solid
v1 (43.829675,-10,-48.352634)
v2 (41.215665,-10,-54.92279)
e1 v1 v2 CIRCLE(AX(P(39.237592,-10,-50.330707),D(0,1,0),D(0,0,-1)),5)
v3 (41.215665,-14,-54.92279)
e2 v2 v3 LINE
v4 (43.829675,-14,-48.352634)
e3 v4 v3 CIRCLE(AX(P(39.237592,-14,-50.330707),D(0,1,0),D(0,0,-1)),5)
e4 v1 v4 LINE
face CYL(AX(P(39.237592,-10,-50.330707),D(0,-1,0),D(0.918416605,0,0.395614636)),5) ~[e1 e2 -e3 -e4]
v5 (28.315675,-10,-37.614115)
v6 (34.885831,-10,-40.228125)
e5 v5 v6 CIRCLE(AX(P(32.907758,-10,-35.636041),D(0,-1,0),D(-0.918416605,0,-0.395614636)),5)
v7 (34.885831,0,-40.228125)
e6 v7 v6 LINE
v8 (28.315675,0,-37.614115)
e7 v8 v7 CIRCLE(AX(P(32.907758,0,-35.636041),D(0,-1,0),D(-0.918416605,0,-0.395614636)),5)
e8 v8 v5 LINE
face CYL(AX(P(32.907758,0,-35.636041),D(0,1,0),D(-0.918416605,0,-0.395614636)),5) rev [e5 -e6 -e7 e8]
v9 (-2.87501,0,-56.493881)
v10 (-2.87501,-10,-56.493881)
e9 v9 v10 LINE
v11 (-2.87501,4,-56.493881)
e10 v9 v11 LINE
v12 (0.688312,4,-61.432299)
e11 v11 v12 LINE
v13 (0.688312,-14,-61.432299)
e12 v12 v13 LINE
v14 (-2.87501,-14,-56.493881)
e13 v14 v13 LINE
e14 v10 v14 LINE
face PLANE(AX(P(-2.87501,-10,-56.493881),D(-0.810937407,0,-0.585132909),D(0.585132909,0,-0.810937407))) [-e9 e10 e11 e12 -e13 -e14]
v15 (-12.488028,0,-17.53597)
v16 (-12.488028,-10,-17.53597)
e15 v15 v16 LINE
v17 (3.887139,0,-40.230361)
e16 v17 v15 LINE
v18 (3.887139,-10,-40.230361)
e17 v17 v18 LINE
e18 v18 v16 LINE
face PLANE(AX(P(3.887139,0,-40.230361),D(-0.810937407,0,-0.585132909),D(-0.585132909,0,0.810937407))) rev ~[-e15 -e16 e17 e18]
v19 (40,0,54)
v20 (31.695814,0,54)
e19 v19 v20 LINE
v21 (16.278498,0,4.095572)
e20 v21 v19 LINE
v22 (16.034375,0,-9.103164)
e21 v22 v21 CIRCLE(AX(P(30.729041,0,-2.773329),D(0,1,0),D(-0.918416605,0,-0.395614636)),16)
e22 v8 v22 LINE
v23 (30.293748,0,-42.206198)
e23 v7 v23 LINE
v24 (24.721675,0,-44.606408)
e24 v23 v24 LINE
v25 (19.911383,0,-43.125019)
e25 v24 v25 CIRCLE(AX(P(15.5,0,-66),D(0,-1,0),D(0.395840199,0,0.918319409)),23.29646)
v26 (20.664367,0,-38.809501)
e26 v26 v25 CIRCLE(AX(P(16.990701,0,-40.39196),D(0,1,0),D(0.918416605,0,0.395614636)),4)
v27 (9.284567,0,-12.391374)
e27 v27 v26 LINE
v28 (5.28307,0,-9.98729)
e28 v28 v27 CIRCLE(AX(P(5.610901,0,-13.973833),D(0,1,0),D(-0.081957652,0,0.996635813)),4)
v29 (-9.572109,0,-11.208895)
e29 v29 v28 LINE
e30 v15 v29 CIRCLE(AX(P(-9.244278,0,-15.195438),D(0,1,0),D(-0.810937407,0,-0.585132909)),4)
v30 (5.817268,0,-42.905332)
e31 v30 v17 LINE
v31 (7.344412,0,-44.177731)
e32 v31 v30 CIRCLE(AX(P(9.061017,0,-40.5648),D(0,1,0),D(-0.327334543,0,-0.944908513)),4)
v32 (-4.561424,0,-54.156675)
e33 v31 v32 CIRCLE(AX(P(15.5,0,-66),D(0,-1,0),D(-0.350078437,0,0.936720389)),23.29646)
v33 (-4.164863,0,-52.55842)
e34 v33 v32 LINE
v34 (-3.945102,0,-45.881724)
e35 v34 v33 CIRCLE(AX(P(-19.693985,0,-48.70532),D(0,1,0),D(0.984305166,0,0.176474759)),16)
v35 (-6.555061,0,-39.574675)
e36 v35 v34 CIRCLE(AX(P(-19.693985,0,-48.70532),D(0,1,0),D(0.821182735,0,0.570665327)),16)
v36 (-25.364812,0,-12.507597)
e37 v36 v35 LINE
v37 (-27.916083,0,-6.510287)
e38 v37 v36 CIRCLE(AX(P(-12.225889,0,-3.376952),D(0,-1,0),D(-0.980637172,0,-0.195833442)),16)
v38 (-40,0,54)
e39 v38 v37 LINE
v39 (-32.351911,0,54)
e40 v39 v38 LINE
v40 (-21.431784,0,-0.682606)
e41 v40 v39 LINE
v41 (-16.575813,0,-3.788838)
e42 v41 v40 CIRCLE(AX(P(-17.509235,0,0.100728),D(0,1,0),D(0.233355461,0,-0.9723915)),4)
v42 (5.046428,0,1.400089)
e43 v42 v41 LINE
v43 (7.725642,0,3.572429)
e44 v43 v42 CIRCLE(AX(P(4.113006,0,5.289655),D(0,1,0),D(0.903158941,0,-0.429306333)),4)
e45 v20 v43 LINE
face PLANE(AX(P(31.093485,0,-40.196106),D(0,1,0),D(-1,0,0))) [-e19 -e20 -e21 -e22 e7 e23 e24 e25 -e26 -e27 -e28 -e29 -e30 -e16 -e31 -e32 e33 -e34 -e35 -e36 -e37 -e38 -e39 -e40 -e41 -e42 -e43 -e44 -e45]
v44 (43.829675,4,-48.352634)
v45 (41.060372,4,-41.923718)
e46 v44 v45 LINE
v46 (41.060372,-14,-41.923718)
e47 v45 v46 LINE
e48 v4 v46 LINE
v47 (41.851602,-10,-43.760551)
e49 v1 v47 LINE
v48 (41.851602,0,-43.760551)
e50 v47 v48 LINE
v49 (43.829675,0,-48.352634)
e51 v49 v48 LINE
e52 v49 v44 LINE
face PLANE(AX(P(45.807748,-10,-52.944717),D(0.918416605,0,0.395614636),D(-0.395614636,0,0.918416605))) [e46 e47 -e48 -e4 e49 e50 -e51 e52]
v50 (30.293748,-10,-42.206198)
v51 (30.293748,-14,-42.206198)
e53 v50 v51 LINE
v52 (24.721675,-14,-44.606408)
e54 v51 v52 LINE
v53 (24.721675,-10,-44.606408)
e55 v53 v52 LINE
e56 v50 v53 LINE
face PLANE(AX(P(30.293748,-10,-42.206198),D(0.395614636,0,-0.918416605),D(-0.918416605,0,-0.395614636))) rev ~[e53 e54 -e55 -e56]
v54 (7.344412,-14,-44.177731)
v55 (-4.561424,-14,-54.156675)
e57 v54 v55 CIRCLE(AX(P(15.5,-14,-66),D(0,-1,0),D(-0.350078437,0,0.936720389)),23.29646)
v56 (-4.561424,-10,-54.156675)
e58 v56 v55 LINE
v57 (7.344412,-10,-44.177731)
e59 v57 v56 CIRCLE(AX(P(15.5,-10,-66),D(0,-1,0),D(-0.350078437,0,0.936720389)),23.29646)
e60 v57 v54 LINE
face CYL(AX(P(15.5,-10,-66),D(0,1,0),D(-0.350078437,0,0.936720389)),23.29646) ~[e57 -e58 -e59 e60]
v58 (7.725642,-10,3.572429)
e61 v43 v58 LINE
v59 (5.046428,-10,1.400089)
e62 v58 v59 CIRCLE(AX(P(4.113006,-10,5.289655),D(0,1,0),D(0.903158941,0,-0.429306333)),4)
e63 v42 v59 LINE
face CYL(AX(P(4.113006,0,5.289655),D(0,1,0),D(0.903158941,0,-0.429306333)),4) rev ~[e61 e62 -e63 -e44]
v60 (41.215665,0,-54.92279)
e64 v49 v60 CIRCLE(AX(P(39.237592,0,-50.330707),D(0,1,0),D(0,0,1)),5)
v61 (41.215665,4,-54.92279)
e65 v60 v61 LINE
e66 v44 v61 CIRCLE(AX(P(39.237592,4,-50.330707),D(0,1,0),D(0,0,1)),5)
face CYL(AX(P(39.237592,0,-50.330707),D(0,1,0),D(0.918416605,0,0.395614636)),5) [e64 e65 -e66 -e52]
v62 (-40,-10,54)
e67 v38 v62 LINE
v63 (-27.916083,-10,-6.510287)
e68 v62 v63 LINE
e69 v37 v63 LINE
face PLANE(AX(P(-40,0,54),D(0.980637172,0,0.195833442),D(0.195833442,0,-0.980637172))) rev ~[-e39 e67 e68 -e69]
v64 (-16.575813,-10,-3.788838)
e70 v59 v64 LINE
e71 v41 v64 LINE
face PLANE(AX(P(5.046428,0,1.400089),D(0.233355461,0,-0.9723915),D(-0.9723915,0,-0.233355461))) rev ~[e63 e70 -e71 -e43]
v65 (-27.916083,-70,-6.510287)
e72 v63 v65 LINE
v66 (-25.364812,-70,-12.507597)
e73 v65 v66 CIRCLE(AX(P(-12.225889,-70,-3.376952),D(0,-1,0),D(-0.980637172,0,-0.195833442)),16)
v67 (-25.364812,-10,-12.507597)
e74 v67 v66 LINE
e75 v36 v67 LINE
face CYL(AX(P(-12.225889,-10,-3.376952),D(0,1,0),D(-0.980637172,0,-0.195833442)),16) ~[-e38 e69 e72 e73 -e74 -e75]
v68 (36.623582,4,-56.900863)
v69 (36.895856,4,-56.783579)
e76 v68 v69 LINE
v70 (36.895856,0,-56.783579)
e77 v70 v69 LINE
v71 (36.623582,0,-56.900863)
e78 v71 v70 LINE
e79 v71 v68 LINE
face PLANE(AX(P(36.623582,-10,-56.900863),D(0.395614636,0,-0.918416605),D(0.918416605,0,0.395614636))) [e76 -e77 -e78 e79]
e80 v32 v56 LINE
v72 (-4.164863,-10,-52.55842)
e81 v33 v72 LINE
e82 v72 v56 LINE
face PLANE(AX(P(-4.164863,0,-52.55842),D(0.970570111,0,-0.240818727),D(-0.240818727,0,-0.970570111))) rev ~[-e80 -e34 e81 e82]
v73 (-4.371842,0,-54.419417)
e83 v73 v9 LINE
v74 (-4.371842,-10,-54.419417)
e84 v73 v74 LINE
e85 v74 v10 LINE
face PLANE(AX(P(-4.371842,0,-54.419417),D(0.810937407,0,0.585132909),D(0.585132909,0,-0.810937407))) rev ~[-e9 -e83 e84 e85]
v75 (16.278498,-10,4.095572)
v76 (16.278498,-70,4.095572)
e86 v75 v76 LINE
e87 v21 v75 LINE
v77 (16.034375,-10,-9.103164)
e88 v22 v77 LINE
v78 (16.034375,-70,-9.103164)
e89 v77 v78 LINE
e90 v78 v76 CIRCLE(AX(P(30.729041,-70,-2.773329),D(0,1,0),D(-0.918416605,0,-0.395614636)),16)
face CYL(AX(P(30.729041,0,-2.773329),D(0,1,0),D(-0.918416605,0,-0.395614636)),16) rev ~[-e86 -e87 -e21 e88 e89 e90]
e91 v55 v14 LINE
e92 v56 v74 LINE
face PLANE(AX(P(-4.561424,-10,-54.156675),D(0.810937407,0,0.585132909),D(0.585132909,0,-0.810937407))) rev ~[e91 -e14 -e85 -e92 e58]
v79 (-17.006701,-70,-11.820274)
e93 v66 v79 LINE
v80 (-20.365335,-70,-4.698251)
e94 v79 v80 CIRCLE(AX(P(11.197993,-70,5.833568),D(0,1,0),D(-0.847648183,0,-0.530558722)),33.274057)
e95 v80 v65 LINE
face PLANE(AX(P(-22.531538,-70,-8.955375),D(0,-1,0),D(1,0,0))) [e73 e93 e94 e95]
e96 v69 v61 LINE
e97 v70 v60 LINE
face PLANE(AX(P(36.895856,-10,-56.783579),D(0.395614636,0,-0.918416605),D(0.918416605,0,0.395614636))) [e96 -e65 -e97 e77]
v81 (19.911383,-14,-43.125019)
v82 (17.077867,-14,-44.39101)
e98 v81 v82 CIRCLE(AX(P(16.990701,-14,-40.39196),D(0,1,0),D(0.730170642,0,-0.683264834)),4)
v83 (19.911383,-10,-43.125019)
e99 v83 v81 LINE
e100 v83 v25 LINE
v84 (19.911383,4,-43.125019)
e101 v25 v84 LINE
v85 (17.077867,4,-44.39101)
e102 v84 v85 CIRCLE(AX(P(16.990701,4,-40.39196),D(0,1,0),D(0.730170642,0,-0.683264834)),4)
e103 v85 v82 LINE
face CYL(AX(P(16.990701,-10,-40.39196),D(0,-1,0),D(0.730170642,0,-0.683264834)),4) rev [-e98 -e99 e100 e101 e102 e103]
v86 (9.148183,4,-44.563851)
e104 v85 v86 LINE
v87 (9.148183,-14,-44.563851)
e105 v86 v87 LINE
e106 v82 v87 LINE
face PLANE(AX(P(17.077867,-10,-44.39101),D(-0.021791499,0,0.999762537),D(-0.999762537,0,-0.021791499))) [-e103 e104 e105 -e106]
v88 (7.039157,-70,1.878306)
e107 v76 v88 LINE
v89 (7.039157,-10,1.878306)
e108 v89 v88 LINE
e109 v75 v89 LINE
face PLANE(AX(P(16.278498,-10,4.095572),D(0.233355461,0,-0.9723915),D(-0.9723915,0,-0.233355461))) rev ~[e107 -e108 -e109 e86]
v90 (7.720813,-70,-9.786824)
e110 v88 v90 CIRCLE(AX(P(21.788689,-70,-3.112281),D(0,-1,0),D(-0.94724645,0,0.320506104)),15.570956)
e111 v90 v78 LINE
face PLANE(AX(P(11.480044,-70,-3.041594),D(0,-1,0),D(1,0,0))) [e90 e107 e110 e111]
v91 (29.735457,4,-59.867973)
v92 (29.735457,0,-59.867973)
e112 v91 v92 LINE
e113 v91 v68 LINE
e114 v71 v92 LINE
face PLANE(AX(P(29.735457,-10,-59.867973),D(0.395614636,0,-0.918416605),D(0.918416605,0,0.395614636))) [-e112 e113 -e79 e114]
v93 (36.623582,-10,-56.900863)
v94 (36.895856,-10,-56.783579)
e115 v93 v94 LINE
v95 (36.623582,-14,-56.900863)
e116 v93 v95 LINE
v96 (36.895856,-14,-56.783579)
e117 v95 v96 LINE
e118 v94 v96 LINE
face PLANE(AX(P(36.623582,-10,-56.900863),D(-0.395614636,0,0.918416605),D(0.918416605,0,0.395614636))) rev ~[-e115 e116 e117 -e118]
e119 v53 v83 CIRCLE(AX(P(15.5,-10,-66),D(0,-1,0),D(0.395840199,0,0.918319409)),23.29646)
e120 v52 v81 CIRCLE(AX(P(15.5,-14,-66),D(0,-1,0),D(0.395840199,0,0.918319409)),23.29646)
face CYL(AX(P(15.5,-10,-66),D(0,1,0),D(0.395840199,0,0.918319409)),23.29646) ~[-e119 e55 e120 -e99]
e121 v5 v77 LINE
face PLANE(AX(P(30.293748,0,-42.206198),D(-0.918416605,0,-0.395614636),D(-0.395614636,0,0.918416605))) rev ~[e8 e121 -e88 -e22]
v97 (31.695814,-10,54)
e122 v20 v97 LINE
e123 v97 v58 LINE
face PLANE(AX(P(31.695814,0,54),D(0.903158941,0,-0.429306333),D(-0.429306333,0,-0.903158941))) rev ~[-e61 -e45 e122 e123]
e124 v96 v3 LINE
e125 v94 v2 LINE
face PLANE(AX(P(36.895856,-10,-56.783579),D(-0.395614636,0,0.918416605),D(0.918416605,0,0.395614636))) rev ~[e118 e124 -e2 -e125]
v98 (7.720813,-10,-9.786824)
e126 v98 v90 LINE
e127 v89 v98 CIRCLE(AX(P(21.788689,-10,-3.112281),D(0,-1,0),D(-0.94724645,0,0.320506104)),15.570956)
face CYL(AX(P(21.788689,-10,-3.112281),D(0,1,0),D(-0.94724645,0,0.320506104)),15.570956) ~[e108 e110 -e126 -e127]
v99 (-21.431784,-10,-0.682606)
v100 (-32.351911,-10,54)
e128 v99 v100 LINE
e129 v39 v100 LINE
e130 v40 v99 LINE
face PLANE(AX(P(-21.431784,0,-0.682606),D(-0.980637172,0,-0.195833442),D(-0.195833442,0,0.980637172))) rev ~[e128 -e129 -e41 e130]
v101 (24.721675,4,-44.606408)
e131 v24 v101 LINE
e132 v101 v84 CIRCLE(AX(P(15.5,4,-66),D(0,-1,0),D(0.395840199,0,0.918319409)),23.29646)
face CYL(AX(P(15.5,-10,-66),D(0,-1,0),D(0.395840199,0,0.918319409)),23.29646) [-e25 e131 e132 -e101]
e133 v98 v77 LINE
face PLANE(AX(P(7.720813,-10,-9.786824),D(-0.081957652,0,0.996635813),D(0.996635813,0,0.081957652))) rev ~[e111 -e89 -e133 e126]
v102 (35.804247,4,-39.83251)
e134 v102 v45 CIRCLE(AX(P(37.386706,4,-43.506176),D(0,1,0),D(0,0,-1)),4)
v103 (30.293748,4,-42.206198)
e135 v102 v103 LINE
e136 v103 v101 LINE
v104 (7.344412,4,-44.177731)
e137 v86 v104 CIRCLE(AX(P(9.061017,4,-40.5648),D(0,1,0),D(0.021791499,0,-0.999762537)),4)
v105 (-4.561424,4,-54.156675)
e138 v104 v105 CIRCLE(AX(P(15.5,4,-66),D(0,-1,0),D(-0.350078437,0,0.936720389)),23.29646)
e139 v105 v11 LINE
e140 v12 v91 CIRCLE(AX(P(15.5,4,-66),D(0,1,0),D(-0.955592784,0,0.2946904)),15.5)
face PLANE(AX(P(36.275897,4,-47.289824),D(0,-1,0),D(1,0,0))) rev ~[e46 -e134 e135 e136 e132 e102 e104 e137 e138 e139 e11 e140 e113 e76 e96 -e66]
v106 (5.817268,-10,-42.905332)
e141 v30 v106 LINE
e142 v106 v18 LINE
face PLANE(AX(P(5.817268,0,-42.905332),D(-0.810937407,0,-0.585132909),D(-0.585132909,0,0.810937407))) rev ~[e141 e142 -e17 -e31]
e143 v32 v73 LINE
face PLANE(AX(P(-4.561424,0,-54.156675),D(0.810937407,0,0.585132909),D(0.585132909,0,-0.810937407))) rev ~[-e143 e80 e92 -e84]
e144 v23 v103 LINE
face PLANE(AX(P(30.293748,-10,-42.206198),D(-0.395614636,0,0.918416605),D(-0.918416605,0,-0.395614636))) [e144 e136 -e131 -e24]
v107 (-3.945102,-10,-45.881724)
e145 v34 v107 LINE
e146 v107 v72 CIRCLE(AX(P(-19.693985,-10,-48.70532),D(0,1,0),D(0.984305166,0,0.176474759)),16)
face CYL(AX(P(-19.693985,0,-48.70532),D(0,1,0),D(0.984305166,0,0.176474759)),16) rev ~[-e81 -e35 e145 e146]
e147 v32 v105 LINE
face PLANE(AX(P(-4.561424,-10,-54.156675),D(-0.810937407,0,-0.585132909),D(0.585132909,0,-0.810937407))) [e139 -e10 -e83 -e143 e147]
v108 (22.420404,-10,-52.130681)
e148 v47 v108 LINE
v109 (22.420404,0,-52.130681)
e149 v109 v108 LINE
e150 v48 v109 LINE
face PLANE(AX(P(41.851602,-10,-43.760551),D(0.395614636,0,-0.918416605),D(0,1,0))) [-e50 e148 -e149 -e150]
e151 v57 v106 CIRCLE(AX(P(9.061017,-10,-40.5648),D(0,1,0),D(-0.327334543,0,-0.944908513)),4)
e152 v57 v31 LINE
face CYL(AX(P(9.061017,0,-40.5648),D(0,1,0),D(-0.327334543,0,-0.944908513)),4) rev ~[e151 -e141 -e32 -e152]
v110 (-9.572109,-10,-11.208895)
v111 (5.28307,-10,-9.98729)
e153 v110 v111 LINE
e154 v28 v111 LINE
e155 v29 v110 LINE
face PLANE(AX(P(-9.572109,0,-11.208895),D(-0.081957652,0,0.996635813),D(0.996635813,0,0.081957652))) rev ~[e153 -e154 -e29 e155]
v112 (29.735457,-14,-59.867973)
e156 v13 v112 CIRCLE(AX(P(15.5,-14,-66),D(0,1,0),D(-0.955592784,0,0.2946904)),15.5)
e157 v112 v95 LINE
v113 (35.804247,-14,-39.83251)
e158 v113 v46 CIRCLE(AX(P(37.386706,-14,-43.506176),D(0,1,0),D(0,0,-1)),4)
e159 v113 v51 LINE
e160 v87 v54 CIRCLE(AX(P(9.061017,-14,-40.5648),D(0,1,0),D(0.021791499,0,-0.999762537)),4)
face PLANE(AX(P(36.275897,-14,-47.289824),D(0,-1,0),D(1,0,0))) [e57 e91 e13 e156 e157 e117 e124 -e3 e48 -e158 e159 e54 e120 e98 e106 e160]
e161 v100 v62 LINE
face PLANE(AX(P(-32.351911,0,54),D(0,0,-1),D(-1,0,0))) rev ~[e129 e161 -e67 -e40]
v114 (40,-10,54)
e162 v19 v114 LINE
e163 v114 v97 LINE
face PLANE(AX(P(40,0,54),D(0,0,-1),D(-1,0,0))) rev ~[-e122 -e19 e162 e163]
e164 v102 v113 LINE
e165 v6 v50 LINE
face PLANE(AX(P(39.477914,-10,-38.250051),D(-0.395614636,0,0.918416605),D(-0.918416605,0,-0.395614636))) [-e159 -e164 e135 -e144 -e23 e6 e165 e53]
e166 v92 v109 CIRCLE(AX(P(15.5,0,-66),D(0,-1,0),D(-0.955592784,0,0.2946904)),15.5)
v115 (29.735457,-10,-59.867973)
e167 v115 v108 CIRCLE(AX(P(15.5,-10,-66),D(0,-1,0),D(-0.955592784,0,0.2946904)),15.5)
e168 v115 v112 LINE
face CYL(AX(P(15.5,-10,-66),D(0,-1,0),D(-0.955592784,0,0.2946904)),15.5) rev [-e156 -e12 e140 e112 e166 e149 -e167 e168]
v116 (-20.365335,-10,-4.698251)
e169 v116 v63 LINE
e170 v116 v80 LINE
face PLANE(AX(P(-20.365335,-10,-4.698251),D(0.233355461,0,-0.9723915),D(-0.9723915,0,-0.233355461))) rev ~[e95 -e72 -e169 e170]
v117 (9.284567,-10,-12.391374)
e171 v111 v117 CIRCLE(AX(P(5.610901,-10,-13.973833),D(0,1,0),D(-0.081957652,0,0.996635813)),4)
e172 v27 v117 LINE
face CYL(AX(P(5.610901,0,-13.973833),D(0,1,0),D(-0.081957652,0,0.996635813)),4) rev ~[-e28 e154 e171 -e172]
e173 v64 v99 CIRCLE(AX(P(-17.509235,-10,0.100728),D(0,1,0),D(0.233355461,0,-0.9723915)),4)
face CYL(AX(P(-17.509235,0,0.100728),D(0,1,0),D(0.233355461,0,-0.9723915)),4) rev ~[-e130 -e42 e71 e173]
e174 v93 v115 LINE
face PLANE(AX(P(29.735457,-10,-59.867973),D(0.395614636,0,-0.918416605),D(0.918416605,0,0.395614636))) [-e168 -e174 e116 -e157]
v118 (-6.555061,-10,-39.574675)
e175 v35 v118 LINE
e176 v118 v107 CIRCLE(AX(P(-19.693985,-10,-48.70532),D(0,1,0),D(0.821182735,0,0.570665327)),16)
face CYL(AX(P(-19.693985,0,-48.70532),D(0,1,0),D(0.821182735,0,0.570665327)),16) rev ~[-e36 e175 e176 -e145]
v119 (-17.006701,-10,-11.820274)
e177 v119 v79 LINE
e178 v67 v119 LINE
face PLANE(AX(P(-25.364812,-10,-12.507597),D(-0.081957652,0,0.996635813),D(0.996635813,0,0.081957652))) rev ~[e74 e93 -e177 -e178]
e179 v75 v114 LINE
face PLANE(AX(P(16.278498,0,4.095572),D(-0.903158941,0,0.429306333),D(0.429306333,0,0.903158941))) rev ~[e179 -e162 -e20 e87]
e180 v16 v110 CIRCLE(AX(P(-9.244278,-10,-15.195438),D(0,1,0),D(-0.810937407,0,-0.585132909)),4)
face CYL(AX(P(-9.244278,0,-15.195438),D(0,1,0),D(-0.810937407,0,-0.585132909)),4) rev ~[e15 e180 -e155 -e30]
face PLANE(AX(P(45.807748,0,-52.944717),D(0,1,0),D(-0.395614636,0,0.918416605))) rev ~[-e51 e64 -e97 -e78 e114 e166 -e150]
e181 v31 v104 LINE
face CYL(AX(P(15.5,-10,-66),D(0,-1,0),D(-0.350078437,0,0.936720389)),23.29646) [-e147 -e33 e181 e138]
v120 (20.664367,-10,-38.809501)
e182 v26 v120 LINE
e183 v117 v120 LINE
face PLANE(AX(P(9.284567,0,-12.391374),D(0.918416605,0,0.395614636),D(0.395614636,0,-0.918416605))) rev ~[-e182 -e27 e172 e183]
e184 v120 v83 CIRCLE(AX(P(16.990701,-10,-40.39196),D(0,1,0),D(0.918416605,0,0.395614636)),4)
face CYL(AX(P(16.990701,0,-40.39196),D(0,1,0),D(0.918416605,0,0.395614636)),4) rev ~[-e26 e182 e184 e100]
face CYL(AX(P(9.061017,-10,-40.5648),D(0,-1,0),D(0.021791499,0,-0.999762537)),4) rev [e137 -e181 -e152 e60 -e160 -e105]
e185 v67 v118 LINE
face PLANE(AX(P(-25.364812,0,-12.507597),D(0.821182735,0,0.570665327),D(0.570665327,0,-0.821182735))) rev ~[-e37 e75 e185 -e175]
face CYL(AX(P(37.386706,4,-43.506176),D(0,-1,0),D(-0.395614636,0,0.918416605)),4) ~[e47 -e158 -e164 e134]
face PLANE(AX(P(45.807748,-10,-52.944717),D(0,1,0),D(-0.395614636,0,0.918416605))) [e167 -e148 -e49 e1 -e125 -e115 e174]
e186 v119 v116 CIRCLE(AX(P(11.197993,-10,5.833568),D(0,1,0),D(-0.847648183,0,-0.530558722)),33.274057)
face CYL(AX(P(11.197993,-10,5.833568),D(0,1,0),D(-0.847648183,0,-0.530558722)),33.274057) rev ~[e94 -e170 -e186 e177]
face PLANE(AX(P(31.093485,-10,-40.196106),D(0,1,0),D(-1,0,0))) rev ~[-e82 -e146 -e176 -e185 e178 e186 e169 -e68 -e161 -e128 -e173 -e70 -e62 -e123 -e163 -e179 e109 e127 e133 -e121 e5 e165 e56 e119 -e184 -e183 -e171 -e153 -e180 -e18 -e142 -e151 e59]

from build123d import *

# Parameters (mm, degrees)
F1_DEPTH      = 10
F3_DEPTH      = 4
F3_DEPTH_BACK = 14
F4_W          = 10
F4_H          = 10
F5_DEPTH      = 25
F6_T1_DEPTH   = 10
F7_R          = 4
F8_R          = 5
F10_DEPTH     = 60


# Not quite as in the source:
# - a fillet or chamfer that OpenCascade refuses, or shapes differently, is made with other operations: its cross-section is extruded or revolved along the edge and cut away or added
# - a feature names something its author has since deleted; it is built from what else it names


with BuildPart() as f1:
    # F0 (on Front) → F1 (new body)
    with BuildSketch(Plane.XZ):
        with BuildLine():
            ThreePointArc((19.6522871604, -43.3779198274), (22.0356929141, -43.9481357221), (24.344898549, -44.7687077723))
            Line((24.344898549, -44.7687077723), (30.2937477303, -42.2061976958))
            Line((30.2937477303, -42.2061976958), (16.0343749186, -9.1031636608))
            ThreePointArc((16.0343749186, -9.1031636608), (14.7317766807, -2.4774455359), (16.2784975378, 4.0955718405))
            Line((16.2784975378, 4.0955718405), (40, 54))
            Line((40, 54), (31.6958138155, 54))
            Line((31.6958138155, 54), (7.7256415471, 3.5724294089))
            ThreePointArc((7.7256415471, 3.5724294089), (6.6322171557, 2.1826346144), (5.0464276278, 1.4000887411))
            Line((5.0464276278, 1.4000887411), (-16.5758134292, -3.788837771))
            ThreePointArc((-16.5758134292, -3.788837771), (-19.6646678264, -3.268857876), (-21.4317839616, -0.6826055404))
            Line((-21.4317839616, -0.6826055404), (-32.3519113749, 54))
            Line((-32.3519113749, 54), (-40, 54))
            Line((-40, 54), (-27.9160834498, -6.5102868387))
            ThreePointArc((-27.9160834498, -6.5102868387), (-26.9490490541, -9.6402216111), (-25.3648124606, -12.5075969995))
            Line((-25.3648124606, -12.5075969995), (-6.5550611463, -39.5746751924))
            ThreePointArc((-6.5550611463, -39.5746751924), (-4.9098360692, -42.5874005907), (-3.945102256, -45.8817242769))
            Line((-3.945102256, -45.8817242769), (3.8871387568, -40.2303608977))
            Line((3.8871387568, -40.2303608977), (-12.4880276922, -17.5359698901))
            ThreePointArc((-12.4880276922, -17.5359698901), (-12.8770477363, -13.5212266501), (-9.5721086698, -11.2088950032))
            Line((-9.5721086698, -11.2088950032), (5.2830699548, -9.987289736))
            ThreePointArc((5.2830699548, -9.987289736), (7.6708908871, -10.5450664651), (9.284566981, -12.3913744428))
            Line((9.284566981, -12.3913744428), (20.6643672802, -38.8095010734))
            ThreePointArc((20.6643672802, -38.8095010734), (20.8960138101, -41.2571363473), (19.6522871604, -43.3779198274))
        make_face()
        with BuildLine():
            Line((-4.3718418374, -54.4194170272), (-2.8750095458, -56.4938812719))
            Line((-2.8750095458, -56.4938812719), (24.344898549, -44.7687077723))
            ThreePointArc((24.344898549, -44.7687077723), (22.0356929141, -43.9481357221), (19.6522871604, -43.3779198274))
            ThreePointArc((19.6522871604, -43.3779198274), (18.4554525804, -44.1141232898), (17.0778668556, -44.3910097661))
            Line((17.0778668556, -44.3910097661), (9.1481831441, -44.5638505003))
            ThreePointArc((9.1481831441, -44.5638505003), (8.440161238, -44.5163238476), (7.7516789791, -44.3444344023))
            ThreePointArc((7.7516789791, -44.3444344023), (0.7998412321, -48.3108696597), (-4.3718418374, -54.4194170272))
        make_face()
        with BuildLine():
            Line((-4.5614236042, -54.156675103), (-4.3718418374, -54.4194170272))
            ThreePointArc((-4.3718418374, -54.4194170272), (0.7998412321, -48.3108696597), (7.7516789791, -44.3444344023))
            ThreePointArc((7.7516789791, -44.3444344023), (6.6734648322, -43.7740983951), (5.81726752, -42.9053319878))
            Line((5.81726752, -42.9053319878), (3.8871387568, -40.2303608977))
            Line((3.8871387568, -40.2303608977), (-3.945102256, -45.8817242769))
            ThreePointArc((-3.945102256, -45.8817242769), (-3.7026448472, -49.2316692283), (-4.1648631271, -52.5584200507))
            Line((-4.1648631271, -52.5584200507), (-4.5614236042, -54.156675103))
        make_face()
        Polygon((30.2937477303, -42.2061976958), (36.6235819074, -56.9008633705), (45.807747954, -52.9447170098), (39.477913777, -38.2500513351), align=None)
        with BuildLine():
            ThreePointArc((24.344898549, -44.7687077723), (31.6655422142, -49.6392162498), (36.6235819074, -56.9008633705))
            Line((36.6235819074, -56.9008633705), (30.2937477303, -42.2061976958))
            Line((30.2937477303, -42.2061976958), (24.344898549, -44.7687077723))
        make_face()
    extrude(amount=F1_DEPTH)

    # F2 (on face) → F3 (join, two sides)
    with BuildSketch(Plane.XZ.offset(10)) as f3_sk:
        with BuildLine():
            Line((45.807747954, -52.9447170098), (39.477913777, -38.2500513351))
            Line((39.477913777, -38.2500513351), (30.2937477303, -42.2061976958))
            Line((30.2937477303, -42.2061976958), (24.721675481, -44.6064083669))
            ThreePointArc((24.721675481, -44.6064083669), (31.9751079214, -49.5289380846), (36.8958559524, -56.7835793441))
            Line((36.8958559524, -56.7835793441), (45.807747954, -52.9447170098))
        make_face()
        with BuildLine():
            Line((36.6235819074, -56.9008633705), (36.8958559524, -56.7835793441))
            ThreePointArc((36.8958559524, -56.7835793441), (31.9751079214, -49.5289380846), (24.721675481, -44.6064083669))
            ThreePointArc((24.721675481, -44.6064083669), (22.3566538827, -43.7354236695), (19.9113834301, -43.1250189536))
            ThreePointArc((19.9113834301, -43.1250189536), (18.6224089936, -44.0440177459), (17.0778668556, -44.3910097661))
            Line((17.0778668556, -44.3910097661), (9.1481831441, -44.5638505003))
            ThreePointArc((9.1481831441, -44.5638505003), (8.2237355637, -44.4761887941), (7.3444115948, -44.177730654))
            ThreePointArc((7.3444115948, -44.177730654), (0.5352155123, -48.1455807465), (-4.5614236042, -54.156675103))
            Line((-4.5614236042, -54.156675103), (-2.8750095458, -56.4938812719))
            Line((-2.8750095458, -56.4938812719), (24.344898549, -44.7687077723))
            ThreePointArc((24.344898549, -44.7687077723), (31.6655422142, -49.6392162498), (36.6235819074, -56.9008633705))
        make_face()
        with BuildLine():
            Line((29.7354573724, -59.867973141), (36.6235819074, -56.9008633705))
            ThreePointArc((36.6235819074, -56.9008633705), (31.6655422142, -49.6392162498), (24.344898549, -44.7687077723))
            Line((24.344898549, -44.7687077723), (-2.8750095458, -56.4938812719))
            Line((-2.8750095458, -56.4938812719), (0.6883118522, -61.4322988045))
            ThreePointArc((0.6883118522, -61.4322988045), (14.6664598558, -50.5224287814), (29.7354573724, -59.867973141))
        make_face()
    extrude(amount=F3_DEPTH)
    extrude(f3_sk.sketch, amount=-F3_DEPTH_BACK)

    # F4 (on face) → F5 (cut)
    with BuildSketch(Plane(origin=(19.4014510262, 0, 8.35731622), x_dir=(0, 1, 0), z_dir=(0.9184166047, 0, 0.3956146361))):
        with Locations((-5, -61.7475227671)):
            Rectangle(F4_W, F4_H)
    extrude(amount=-F5_DEPTH, mode=Mode.SUBTRACT)

    # F6: fillet of radius 5 on 1 edges, made by hand

    # F6_s2 → F6_t1 (join)
    with BuildSketch(Plane.XZ):
        with BuildLine():
            ThreePointArc((28.31567455, -37.6141146724), (31.0593734872, -40.2818434972), (34.8858307536, -40.2281245155))
            Line((34.8858307536, -40.2281245155), (30.2937477303, -42.2061976958))
            Line((30.2937477303, -42.2061976958), (28.31567455, -37.6141146724))
        make_face()
    extrude(amount=F6_T1_DEPTH)

    # F7
    f7_edges = [f1.edges().sort_by_distance(p)[0] for p in [
        (39.477914, -5, -38.250051),
    ]]
    fillet(f7_edges, radius=F7_R)

    # F8
    f8_edges = [f1.edges().sort_by_distance(p)[0] for p in [
        (45.807748, -12, -52.944717),
        (45.807748, 2, -52.944717),
    ]]
    fillet(f8_edges, radius=F8_R)

    # F9 (on face) → F10 (join)
    with BuildSketch(Plane.XZ.offset(10)):
        with BuildLine():
            ThreePointArc((-17.0067008, -11.8202735087), (-18.8974369177, -8.3589640964), (-20.3653347512, -4.6982507964))
            Line((-20.3653347512, -4.6982507964), (-27.9160834498, -6.5102868387))
            ThreePointArc((-27.9160834498, -6.5102868387), (-26.9490490541, -9.6402216111), (-25.3648124606, -12.5075969995))
            Line((-25.3648124606, -12.5075969995), (-17.0067008, -11.8202735087))
        make_face()
        with BuildLine():
            Line((16.2784975378, 4.0955718405), (7.0391568902, 1.8783058544))
            ThreePointArc((7.0391568902, 1.8783058544), (6.2442508473, -4.0206259595), (7.72081337, -9.7868236042))
            Line((7.72081337, -9.7868236042), (16.0343749186, -9.1031636608))
            ThreePointArc((16.0343749186, -9.1031636608), (14.7317766807, -2.4774455359), (16.2784975378, 4.0955718405))
        make_face()
    extrude(amount=F10_DEPTH)


solid = f1.part
